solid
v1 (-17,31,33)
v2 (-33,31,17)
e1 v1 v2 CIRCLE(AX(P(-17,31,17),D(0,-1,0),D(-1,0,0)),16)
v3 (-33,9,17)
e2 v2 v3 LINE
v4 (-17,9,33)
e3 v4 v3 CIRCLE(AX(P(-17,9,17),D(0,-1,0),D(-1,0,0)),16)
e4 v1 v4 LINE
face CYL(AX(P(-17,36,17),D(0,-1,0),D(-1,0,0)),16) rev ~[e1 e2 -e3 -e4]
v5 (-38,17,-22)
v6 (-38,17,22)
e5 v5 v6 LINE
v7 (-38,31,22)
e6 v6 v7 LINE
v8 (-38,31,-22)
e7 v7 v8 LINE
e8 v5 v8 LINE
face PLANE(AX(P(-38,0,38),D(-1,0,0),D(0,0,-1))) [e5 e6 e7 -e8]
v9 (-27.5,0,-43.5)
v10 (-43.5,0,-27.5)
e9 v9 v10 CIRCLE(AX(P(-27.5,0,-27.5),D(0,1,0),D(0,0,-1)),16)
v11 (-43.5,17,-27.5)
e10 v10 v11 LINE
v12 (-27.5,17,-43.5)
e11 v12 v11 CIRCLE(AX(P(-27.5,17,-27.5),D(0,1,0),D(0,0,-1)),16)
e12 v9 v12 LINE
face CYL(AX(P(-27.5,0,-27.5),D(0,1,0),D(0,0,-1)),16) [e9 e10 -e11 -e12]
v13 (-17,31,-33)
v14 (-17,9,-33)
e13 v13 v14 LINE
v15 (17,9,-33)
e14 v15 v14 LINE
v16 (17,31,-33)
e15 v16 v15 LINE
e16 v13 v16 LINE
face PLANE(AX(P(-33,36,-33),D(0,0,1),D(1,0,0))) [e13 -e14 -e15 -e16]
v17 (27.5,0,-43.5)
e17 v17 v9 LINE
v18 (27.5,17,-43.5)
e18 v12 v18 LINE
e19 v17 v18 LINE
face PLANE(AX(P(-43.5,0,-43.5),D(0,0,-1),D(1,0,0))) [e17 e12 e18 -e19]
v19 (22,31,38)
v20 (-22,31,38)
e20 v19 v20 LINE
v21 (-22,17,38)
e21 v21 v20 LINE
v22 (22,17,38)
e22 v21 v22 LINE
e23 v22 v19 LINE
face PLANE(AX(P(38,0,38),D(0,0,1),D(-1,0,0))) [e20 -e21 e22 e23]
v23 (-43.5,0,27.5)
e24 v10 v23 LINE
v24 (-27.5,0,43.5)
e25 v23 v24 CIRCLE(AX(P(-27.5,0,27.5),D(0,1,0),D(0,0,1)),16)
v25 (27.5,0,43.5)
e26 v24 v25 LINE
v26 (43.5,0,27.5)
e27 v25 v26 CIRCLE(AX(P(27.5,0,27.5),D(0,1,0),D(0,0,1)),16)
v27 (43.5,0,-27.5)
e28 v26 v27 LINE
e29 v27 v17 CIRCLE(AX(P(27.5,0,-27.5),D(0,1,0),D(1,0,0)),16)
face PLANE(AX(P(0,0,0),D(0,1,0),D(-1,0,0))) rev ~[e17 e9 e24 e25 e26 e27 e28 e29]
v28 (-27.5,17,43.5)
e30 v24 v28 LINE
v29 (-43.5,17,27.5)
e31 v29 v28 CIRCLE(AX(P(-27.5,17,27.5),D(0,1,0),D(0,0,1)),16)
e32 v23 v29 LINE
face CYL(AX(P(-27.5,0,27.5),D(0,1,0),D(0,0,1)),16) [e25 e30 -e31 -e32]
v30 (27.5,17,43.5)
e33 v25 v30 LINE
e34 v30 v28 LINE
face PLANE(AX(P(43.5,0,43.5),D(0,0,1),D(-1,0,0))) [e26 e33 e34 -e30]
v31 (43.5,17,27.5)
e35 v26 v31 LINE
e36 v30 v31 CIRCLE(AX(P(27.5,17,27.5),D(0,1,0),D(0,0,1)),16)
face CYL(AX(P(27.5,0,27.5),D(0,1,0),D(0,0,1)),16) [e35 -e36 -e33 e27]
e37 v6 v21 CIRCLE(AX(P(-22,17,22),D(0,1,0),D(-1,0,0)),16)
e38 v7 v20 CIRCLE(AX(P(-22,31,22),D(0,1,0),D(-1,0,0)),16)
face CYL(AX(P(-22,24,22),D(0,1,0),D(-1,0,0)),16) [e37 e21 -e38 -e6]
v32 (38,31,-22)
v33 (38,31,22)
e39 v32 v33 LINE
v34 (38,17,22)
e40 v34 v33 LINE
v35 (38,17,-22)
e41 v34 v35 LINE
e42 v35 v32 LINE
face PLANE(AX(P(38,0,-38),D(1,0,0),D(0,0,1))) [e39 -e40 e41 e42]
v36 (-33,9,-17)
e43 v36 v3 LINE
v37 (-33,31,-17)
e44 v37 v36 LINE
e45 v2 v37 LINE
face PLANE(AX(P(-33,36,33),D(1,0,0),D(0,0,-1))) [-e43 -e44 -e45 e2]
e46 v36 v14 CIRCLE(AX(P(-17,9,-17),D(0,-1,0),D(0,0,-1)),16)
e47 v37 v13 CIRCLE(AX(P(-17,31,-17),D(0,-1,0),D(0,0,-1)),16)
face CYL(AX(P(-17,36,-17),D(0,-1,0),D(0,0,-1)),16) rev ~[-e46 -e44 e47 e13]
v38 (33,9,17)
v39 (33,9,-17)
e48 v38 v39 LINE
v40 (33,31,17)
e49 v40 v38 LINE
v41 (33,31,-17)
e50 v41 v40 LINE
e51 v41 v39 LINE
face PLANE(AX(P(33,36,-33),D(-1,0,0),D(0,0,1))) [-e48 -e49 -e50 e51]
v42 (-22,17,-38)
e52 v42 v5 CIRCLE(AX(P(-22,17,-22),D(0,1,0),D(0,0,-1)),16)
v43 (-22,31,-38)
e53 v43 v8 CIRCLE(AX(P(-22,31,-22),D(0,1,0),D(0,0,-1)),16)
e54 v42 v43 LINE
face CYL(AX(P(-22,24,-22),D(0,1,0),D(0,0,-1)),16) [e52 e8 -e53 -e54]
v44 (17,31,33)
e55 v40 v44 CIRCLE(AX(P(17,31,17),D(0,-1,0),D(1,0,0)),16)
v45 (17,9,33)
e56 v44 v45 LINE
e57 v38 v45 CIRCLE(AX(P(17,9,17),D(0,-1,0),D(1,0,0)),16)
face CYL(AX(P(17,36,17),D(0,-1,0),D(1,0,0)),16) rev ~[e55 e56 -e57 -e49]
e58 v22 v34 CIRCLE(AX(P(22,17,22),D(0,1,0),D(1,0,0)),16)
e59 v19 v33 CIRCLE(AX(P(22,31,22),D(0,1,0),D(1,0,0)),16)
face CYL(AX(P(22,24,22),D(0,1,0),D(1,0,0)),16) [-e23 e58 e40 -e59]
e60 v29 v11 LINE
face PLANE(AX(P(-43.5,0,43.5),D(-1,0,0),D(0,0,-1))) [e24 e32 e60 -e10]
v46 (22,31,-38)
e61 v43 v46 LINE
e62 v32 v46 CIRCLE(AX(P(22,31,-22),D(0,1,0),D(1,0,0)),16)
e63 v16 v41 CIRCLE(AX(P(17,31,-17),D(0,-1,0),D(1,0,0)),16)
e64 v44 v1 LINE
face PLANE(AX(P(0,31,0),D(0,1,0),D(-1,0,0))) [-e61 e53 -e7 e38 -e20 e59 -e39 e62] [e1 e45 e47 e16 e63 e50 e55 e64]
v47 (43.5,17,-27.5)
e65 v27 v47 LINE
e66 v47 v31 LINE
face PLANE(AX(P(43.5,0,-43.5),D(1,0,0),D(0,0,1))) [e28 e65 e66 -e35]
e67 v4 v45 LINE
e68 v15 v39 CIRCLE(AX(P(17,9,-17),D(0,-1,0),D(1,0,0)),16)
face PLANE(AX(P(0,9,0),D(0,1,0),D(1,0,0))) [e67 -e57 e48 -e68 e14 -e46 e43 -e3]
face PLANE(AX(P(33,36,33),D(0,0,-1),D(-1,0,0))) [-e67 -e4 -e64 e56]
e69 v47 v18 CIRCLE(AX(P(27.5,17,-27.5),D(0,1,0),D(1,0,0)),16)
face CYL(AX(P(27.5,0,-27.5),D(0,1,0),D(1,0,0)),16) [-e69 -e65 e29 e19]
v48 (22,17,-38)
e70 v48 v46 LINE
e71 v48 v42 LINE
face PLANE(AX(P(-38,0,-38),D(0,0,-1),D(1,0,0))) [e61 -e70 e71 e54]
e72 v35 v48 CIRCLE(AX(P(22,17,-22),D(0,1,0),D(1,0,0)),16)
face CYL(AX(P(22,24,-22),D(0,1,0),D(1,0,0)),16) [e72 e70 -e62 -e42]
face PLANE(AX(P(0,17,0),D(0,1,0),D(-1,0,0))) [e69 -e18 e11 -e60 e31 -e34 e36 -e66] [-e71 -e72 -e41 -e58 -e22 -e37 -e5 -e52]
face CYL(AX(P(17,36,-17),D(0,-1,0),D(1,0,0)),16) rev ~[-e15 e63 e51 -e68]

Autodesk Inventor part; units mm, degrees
ref_plane "YZ Plane" through (0, 0, 0) normal (1, 0, 0) x (0, 1, 0)
ref_plane "XZ Plane" through (0, 0, 0) normal (0, 1, 0) x (-1, 0, 0)
ref_plane "XY Plane" through (0, 0, 0) normal (0, 0, 1) x (1, 0, 0)
sketch "Sketch1" plane through (0, 0, 0) normal (0, 1, 0) x (-1, 0, 0)
  line L0 (-38, 38) -> (38, 38)
  line L1 (38, 38) -> (38, -38)
  line L2 (38, -38) -> (-38, -38)
  line L3 (-38, -38) -> (-38, 38)
  line L4 (-38, 38) -> (38, -38) construction
  line L5 (38, 38) -> (-38, -38) construction
  line L6 (-43.5, 43.5) -> (43.5, 43.5)
  line L7 (43.5, 43.5) -> (43.5, -43.5)
  line L8 (43.5, -43.5) -> (-43.5, -43.5)
  line L9 (-43.5, -43.5) -> (-43.5, 43.5)
  line L10 (-43.5, 43.5) -> (43.5, -43.5) construction
  line L11 (43.5, 43.5) -> (-43.5, -43.5) construction
  point P0 (0, 0)
  dimension "d0" = 76
  dimension "d1" = 76
  dimension "d2" = 87
  dimension "d3" = 87
extrude "Extrusion1" add sketch "Sketch1" along normal blind 36 contours L0 L1 L2 L3
extrude "Extrusion2" add sketch "Sketch1" along normal blind 24 contours L0 L1 L2 L3 | L6 L7 L8 L9
sketch "Sketch2" plane through (0, 36, 0) normal (0, 1, 0) x (1, 0, 0)
  line L0 (33, -33) -> (-33, -33)
  line L1 (-33, -33) -> (-33, 33)
  line L2 (-33, 33) -> (33, 33)
  line L3 (33, 33) -> (33, -33)
  line L4 (33, -33) -> (-33, 33) construction
  line L5 (-33, -33) -> (33, 33) construction
  line L6 (-38, 38) -> (-38, -38) projected
  line L7 (38, 38) -> (-38, 38) projected
  point P0 (0, 0)
  dimension "d8" = 5
  dimension "d9" = 5
extrude "Extrusion3" cut sketch "Sketch2" against normal blind 27
fillet "Fillet1" radius 16 12 edges at (38, 30, 38) (38, 30, -38) (-38, 30, -38) (-38, 30, 38) (-43.5, 12, -43.5) (-43.5, 12, 43.5) (43.5, 12, 43.5) (43.5, 12, -43.5) (33, 22.5, 33) (33, 22.5, -33) (-33, 22.5, -33) (-33, 22.5, 33)
ref_plane "Work Plane1" through (0, 0, -27.5) normal (-1, 0, 0) x (0, 0, 1)
move faces "Move1" translate (0, -6, 0) faces at (41.6667, 24, 7.3333)
move faces "Move2" translate (0, -1, 0) faces at (41.6667, 18, -7.3333)
move faces "Move3" translate (0, -5, 0) faces at (5.6667, 36, -36.3333)
properties part number "Podstawka_dla_skurwysyna"
